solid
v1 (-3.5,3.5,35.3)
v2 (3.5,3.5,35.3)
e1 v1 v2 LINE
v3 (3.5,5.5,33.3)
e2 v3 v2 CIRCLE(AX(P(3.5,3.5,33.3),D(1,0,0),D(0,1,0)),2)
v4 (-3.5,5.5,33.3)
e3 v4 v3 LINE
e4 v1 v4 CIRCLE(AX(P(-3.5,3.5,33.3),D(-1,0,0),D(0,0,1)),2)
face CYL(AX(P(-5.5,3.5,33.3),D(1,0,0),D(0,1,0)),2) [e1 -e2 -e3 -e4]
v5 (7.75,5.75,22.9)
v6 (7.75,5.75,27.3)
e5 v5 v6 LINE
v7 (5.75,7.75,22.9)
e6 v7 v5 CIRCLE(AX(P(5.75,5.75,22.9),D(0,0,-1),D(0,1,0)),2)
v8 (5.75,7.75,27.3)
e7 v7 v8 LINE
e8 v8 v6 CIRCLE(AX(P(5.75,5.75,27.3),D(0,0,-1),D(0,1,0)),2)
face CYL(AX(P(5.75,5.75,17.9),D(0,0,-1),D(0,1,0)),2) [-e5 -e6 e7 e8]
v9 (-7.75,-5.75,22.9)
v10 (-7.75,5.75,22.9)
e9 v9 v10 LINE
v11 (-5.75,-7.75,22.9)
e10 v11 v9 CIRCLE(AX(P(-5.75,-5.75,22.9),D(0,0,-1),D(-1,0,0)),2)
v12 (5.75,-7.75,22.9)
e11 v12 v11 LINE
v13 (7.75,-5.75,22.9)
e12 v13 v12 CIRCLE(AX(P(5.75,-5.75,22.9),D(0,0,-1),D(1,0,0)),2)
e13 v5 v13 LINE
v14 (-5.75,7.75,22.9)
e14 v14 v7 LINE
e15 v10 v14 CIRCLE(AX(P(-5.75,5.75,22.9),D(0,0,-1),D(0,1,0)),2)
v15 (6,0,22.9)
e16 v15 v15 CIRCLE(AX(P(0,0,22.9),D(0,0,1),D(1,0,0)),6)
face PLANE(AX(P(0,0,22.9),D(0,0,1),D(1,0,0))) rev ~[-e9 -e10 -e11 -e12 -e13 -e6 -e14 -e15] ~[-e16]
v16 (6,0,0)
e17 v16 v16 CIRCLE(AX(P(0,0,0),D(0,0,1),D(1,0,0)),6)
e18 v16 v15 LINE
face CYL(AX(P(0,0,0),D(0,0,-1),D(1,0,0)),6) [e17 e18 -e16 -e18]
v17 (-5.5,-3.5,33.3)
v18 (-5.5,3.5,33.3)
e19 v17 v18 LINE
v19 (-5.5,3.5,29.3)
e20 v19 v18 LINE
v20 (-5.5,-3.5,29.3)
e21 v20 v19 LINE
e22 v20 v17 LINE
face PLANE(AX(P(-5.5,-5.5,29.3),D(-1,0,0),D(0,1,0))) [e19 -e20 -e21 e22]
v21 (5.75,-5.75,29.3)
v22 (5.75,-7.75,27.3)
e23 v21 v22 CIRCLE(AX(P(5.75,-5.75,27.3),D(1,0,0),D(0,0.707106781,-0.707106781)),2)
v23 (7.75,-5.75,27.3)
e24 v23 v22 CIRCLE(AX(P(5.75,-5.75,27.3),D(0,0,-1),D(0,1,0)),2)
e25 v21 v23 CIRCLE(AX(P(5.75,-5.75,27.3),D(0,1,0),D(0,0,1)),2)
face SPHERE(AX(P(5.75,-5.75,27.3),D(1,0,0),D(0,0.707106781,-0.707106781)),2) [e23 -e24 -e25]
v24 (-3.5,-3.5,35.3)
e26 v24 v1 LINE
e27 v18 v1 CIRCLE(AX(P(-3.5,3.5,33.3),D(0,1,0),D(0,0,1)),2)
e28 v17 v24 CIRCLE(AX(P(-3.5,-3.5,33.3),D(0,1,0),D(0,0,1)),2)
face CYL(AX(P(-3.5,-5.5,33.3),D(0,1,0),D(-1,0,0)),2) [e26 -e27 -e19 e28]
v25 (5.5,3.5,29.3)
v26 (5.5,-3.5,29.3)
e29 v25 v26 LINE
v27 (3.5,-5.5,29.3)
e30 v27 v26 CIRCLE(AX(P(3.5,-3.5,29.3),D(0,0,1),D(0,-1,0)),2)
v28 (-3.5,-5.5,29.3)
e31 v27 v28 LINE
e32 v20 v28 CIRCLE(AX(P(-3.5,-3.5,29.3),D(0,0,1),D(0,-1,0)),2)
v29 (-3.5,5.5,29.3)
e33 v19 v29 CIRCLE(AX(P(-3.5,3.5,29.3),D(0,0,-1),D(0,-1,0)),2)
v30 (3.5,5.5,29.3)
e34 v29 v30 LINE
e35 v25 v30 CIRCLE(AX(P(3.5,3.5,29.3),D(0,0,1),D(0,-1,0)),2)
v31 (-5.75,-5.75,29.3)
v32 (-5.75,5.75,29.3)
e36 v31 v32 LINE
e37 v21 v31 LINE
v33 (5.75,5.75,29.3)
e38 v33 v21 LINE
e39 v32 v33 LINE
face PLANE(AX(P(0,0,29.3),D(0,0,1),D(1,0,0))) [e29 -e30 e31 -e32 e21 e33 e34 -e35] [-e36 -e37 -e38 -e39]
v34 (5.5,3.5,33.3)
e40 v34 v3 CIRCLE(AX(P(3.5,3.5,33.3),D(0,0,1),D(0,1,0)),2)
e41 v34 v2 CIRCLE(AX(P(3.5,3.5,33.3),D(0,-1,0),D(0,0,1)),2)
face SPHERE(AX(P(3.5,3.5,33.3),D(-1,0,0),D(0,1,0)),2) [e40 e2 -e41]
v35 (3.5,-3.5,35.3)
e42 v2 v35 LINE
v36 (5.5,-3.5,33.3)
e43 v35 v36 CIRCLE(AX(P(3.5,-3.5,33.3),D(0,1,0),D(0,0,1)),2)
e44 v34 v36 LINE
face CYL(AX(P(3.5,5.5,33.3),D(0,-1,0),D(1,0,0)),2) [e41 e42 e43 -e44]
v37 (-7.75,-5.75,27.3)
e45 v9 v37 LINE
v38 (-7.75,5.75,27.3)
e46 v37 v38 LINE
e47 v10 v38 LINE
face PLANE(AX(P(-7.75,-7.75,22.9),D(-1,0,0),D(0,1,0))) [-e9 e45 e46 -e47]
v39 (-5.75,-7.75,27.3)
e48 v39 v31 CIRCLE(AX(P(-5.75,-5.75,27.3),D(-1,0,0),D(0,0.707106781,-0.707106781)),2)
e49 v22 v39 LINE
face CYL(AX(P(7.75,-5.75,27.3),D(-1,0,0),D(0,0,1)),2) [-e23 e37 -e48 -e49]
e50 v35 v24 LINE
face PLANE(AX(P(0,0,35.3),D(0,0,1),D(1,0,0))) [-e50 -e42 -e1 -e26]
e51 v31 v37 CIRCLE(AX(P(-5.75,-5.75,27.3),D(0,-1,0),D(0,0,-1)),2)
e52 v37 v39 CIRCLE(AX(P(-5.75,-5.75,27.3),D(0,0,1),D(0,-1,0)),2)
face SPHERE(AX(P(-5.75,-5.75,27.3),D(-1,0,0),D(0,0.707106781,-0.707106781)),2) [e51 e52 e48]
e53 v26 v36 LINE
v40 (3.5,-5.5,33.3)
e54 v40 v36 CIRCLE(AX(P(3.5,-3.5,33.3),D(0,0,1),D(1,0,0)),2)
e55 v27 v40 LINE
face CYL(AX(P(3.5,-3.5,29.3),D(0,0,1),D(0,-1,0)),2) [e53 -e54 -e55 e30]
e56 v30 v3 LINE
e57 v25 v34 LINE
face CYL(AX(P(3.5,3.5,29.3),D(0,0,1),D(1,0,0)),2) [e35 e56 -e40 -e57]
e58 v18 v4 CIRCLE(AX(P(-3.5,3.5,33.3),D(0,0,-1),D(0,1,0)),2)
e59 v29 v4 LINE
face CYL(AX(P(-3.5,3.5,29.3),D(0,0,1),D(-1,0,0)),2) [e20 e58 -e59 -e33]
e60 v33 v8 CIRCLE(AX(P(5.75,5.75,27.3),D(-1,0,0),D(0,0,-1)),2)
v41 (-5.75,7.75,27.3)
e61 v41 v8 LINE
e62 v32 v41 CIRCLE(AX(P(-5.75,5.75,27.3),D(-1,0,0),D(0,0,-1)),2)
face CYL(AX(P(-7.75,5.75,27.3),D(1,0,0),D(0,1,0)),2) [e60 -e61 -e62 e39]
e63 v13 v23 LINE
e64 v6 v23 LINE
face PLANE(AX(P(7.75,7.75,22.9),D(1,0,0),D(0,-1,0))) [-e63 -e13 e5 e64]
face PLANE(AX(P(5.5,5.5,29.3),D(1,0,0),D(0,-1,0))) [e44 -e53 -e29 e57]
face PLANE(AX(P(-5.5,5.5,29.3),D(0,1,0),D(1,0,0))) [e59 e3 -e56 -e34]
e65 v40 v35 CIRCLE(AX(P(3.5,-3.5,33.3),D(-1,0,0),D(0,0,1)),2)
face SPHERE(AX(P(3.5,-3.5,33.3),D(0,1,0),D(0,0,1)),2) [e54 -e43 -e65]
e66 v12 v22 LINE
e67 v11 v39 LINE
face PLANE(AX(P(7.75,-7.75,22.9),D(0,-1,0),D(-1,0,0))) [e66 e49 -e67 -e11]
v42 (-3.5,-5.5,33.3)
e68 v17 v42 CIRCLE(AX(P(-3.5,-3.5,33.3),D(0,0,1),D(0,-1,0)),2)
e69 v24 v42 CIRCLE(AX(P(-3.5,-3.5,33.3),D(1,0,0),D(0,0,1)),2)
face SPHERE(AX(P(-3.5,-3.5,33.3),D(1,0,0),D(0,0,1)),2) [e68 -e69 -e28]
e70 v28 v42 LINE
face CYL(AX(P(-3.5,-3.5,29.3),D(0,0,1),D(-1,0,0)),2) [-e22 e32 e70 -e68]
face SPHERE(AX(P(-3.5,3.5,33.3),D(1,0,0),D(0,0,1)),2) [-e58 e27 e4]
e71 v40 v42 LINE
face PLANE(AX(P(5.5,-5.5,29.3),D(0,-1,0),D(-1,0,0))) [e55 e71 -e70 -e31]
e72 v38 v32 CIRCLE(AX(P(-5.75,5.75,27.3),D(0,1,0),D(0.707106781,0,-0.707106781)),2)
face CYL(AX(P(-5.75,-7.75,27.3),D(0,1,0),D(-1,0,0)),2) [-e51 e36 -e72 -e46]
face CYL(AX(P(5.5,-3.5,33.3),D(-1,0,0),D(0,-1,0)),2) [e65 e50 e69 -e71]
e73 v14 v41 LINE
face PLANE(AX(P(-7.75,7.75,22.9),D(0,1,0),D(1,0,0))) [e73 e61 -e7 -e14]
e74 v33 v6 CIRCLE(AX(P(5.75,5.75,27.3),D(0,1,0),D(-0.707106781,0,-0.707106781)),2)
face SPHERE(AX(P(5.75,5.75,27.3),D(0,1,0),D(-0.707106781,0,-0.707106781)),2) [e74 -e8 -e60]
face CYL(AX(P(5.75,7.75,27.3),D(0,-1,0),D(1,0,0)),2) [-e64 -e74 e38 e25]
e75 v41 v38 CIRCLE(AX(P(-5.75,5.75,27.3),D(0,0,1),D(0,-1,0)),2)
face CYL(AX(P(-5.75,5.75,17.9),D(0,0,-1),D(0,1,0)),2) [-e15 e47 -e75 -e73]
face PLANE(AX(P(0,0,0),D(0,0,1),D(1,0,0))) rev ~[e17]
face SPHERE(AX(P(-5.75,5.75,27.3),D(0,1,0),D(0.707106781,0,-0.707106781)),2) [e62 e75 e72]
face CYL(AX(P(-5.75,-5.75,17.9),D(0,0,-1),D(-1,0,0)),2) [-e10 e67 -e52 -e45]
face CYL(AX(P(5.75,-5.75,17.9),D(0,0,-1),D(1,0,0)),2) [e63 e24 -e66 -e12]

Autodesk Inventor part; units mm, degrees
ref_plane "YZ Plane" through (0, 0, 0) normal (1, 0, 0) x (0, 1, 0)
ref_plane "XZ Plane" through (0, 0, 0) normal (0, 1, 0) x (-1, 0, 0)
ref_plane "XY Plane" through (0, 0, 0) normal (0, 0, 1) x (1, 0, 0)
sketch "Sketch1" plane through (0, 0, 0) normal (0, 0, 1) x (1, 0, 0)
  circle A0 centre (0, 0) radius 6
  dimension "d0" = 12
extrude "Extrusion1" add sketch "Sketch1" along normal blind 22.9
sketch "Sketch2" plane through (0, 0, 22.9) normal (0, 0, 1) x (1, 0, 0)
  line L0 (-7.75, 7.75) -> (7.75, 7.75)
  line L1 (7.75, 7.75) -> (7.75, -7.75)
  line L2 (7.75, -7.75) -> (-7.75, -7.75)
  line L3 (-7.75, -7.75) -> (-7.75, 7.75)
  line L4 (-7.75, 7.75) -> (7.75, -7.75) construction
  line L5 (7.75, 7.75) -> (-7.75, -7.75) construction
  point P0 (0, 0)
  dimension "d3" = 15.5
  dimension "d4" = 15.5
extrude "Extrusion2" add sketch "Sketch2" along normal blind 6.4
sketch "Sketch3" plane through (0, 0, 29.3) normal (0, 0, 1) x (1, 0, 0)
  line L0 (-5.5, 5.5) -> (5.5, 5.5)
  line L1 (5.5, 5.5) -> (5.5, -5.5)
  line L2 (5.5, -5.5) -> (-5.5, -5.5)
  line L3 (-5.5, -5.5) -> (-5.5, 5.5)
  line L4 (-5.5, 5.5) -> (5.5, -5.5) construction
  line L5 (5.5, 5.5) -> (-5.5, -5.5) construction
  point P0 (0, 0)
  dimension "d7" = 11
  dimension "d8" = 11
extrude "Extrusion3" add sketch "Sketch3" along normal blind 6
fillet "Fillet1" radius 2 12 edges at (0, 5.5, 35.3) (5.5, 5.5, 32.3) (5.5, 0, 35.3) (0, -5.5, 35.3) (5.5, -5.5, 32.3) (-5.5, 0, 35.3) (-5.5, 5.5, 32.3) (-5.5, -5.5, 32.3) (-7.75, 0, 29.3) (0, -7.75, 29.3) (7.75, 0, 29.3) (0, 7.75, 29.3)
fillet "Fillet2" radius 2 8 edges at (7.1642, -7.1642, 28.7142) (7.75, -7.75, 25.1) (-7.1642, -7.1642, 28.7142) (-7.75, -7.75, 25.1) (7.1642, 7.1642, 28.7142) (7.75, 7.75, 25.1) (-7.1642, 7.1642, 28.7142) (-7.75, 7.75, 25.1)
properties part number "Power Switch"
